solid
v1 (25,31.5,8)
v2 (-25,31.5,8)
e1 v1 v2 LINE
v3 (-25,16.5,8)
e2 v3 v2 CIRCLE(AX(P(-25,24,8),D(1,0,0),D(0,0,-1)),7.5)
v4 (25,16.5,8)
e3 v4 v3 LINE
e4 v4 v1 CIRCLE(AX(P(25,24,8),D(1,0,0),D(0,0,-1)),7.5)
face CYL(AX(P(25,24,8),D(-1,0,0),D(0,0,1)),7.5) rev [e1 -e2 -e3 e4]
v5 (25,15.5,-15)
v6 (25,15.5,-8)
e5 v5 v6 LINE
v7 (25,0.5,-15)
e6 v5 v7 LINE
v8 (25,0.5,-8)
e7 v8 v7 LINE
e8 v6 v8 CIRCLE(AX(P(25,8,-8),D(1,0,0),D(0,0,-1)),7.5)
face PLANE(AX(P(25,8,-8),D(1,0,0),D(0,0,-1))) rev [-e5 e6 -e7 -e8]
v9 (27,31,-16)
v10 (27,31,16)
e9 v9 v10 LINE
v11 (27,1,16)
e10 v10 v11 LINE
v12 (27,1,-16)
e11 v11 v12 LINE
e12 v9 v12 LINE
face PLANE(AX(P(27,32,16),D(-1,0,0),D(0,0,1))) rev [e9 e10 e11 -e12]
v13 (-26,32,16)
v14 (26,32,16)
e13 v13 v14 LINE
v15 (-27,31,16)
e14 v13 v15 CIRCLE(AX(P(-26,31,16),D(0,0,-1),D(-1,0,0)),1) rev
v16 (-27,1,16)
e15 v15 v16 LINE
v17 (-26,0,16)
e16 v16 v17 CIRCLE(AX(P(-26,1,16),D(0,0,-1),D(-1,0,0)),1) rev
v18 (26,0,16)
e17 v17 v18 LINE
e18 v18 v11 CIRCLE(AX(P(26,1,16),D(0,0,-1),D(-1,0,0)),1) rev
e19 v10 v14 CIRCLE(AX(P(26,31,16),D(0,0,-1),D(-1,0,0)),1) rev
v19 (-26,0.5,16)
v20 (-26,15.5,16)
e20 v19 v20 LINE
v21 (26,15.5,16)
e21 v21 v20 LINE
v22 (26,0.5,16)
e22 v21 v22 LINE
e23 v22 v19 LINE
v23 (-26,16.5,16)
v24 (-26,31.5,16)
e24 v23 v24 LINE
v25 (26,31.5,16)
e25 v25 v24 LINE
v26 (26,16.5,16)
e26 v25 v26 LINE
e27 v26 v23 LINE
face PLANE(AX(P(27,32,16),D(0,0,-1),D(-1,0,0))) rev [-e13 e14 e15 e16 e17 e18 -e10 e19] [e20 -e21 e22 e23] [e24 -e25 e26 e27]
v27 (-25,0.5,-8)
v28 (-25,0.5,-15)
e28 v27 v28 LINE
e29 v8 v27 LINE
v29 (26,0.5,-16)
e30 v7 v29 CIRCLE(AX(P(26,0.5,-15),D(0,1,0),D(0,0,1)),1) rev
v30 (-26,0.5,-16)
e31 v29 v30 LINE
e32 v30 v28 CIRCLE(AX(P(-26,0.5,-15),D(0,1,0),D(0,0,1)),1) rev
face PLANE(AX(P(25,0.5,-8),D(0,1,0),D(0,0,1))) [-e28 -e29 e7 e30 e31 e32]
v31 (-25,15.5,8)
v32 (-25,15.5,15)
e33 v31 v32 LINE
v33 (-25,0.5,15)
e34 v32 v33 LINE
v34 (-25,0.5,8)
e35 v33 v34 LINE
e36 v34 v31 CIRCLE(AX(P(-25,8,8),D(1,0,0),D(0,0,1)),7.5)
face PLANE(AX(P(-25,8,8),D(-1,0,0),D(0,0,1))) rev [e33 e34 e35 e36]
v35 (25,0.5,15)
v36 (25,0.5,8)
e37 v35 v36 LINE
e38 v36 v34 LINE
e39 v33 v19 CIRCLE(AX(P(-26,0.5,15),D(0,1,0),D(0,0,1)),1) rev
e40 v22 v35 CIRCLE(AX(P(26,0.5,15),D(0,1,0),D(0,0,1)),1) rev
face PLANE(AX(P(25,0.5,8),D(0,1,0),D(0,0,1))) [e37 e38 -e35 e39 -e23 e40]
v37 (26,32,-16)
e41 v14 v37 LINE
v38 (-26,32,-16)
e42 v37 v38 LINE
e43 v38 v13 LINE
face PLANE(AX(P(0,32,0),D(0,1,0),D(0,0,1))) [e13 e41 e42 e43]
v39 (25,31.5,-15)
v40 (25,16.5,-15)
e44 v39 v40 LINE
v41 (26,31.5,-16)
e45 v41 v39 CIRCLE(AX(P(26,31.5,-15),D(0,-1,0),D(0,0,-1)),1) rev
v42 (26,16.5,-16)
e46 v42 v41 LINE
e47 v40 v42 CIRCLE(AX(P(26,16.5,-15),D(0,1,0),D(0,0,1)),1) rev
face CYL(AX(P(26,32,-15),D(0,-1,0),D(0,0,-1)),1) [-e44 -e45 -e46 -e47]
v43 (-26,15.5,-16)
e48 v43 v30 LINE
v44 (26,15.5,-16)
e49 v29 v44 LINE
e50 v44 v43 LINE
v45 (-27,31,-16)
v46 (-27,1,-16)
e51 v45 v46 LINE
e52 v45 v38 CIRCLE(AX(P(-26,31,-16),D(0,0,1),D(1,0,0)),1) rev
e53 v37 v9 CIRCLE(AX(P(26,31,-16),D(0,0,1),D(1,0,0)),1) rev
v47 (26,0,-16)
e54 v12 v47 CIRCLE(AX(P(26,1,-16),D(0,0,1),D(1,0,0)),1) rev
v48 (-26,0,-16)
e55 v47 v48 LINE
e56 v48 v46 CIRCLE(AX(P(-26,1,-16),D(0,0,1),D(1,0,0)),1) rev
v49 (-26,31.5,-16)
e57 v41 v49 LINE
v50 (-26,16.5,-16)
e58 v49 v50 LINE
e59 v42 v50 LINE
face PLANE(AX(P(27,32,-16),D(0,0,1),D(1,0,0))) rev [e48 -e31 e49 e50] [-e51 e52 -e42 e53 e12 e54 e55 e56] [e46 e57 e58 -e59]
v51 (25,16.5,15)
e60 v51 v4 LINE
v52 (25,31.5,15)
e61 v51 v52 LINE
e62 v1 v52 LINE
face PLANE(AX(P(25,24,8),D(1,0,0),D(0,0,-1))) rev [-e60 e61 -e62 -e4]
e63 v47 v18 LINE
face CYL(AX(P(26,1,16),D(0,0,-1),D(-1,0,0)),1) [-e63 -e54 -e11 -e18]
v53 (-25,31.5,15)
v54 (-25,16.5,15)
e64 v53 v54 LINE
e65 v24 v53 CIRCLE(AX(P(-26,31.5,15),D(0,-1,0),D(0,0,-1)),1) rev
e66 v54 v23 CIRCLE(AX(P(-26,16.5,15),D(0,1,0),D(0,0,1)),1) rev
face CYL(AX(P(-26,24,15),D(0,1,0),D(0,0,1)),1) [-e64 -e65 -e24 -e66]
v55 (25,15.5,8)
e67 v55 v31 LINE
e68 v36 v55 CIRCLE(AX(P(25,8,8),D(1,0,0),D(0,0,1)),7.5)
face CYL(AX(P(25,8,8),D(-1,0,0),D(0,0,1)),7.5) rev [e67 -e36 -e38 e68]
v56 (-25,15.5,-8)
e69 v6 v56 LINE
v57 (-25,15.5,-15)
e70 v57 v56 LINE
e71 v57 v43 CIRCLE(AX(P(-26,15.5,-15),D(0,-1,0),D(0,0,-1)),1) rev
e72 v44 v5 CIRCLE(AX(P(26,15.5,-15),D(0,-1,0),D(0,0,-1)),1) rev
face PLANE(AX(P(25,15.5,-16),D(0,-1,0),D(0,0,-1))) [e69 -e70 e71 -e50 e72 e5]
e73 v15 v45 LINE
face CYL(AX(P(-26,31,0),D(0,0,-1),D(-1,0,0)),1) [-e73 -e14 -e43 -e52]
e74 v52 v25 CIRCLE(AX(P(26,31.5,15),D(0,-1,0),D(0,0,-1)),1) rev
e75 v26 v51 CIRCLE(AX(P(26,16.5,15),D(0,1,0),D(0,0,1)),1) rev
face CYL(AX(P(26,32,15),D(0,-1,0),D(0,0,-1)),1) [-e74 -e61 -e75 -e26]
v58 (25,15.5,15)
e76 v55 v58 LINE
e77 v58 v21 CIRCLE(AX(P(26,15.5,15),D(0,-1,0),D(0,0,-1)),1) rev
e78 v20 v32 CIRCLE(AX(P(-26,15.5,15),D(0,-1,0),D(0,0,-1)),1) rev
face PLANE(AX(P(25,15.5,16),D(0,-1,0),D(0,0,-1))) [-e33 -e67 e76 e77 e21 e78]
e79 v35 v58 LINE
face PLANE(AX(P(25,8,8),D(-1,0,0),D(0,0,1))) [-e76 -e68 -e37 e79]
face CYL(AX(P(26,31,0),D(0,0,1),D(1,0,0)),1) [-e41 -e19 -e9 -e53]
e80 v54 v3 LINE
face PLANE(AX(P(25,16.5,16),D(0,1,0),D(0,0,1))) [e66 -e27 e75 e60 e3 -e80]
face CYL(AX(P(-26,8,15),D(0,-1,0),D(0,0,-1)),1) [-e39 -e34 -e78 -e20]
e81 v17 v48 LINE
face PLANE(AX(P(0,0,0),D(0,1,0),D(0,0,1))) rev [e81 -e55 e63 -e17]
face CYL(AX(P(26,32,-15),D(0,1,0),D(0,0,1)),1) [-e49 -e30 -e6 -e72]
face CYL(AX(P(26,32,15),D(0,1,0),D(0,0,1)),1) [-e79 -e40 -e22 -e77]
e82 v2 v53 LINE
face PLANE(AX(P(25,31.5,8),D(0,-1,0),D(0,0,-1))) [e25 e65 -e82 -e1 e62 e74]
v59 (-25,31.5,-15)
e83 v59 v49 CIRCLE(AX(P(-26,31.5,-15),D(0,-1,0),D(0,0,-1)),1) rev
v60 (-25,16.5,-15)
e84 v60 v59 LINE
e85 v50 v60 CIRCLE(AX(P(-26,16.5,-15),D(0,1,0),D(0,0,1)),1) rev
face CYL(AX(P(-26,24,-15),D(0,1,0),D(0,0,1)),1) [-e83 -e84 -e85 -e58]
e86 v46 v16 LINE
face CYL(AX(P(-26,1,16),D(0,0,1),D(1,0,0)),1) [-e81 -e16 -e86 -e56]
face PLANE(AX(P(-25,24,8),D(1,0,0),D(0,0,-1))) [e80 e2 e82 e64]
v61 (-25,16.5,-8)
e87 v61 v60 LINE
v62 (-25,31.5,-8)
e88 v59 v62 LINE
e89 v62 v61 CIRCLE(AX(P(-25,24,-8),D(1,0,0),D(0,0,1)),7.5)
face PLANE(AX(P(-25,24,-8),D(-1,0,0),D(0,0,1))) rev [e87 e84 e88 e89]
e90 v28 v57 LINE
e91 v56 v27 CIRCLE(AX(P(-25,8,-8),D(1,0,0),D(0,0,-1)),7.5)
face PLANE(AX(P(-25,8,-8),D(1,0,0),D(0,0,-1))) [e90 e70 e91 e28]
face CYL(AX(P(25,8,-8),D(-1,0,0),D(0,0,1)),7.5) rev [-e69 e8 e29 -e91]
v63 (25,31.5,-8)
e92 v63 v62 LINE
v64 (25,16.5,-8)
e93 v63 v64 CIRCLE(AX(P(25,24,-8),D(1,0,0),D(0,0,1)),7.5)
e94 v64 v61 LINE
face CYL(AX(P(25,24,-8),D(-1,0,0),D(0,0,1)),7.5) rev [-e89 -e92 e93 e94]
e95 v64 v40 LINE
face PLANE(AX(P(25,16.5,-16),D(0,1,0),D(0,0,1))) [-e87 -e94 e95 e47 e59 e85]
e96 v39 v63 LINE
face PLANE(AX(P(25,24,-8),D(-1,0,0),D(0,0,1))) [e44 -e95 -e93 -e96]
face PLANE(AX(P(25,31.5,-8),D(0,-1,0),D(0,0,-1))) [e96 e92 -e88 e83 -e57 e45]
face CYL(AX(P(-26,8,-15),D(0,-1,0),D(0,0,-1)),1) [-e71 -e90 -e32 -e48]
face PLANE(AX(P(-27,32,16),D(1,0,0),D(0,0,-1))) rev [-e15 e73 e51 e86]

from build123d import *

# Parameters (mm, degrees)
SKETCH1_W               = 54
SKETCH1_H               = 32
BOSS_EXTRUDE1_DEPTH     = 32
CUT_EXTRUDE1_DEPTH      = 25
CUT_EXTRUDE1_DEPTH_BACK = 25
FILLET1_R               = 1


with BuildPart() as part:
    # Sketch1 → Boss-Extrude1 (new body)
    with BuildSketch(Plane(origin=(0, 0, 0), x_dir=(1, 0, 0), z_dir=(0, 1, 0))):
        Rectangle(SKETCH1_W, SKETCH1_H)
    extrude(amount=BOSS_EXTRUDE1_DEPTH)

    # Sketch2 → Cut-Extrude1 (cut, two sides: drawn at the far end of the back side and taken through both)
    with BuildSketch(Plane(origin=(0, 0, 0), x_dir=(0, 0, -1), z_dir=(1, 0, 0)).offset(-CUT_EXTRUDE1_DEPTH_BACK)):
        with BuildLine():
            Line((-8, 31.5), (-16, 31.5))
            Line((-16, 31.5), (-16, 16.5))
            Line((-16, 16.5), (-8, 16.5))
            ThreePointArc((-8, 16.5), (-0.5, 24), (-8, 31.5))
        make_face()
        with BuildLine():
            Line((16, 16.5), (8, 16.5))
            ThreePointArc((8, 16.5), (0.5, 24), (8, 31.5))
            Line((8, 31.5), (16, 31.5))
            Line((16, 31.5), (16, 16.5))
        make_face()
        with BuildLine():
            Line((16, 0.5), (16, 15.5))
            Line((16, 15.5), (8, 15.5))
            ThreePointArc((8, 15.5), (0.5, 8), (8, 0.5))
            Line((8, 0.5), (16, 0.5))
        make_face()
        with BuildLine():
            Line((-16, 15.5), (-8, 15.5))
            ThreePointArc((-8, 15.5), (-0.5, 8), (-8, 0.5))
            Line((-8, 0.5), (-16, 0.5))
            Line((-16, 0.5), (-16, 15.5))
        make_face()
    extrude(amount=CUT_EXTRUDE1_DEPTH + CUT_EXTRUDE1_DEPTH_BACK, mode=Mode.SUBTRACT)

    # Fillet1
    fillet1_edges = [part.edges().sort_by_distance(p)[0] for p in [
        (27, 32, 0),
        (-25, 24, -16),
        (25, 24, -16),
        (-25, 8, -16),
        (25, 8, -16),
        (-25, 24, 16),
        (25, 24, 16),
        (-27, 32, 0),
        (-25, 8, 16),
        (27, 0, 0),
        (25, 8, 16),
        (-27, 0, 0),
    ]]
    fillet(fillet1_edges, radius=FILLET1_R - 0.0001)  # a hair under: the kernel refuses the full size


solid = part.part
